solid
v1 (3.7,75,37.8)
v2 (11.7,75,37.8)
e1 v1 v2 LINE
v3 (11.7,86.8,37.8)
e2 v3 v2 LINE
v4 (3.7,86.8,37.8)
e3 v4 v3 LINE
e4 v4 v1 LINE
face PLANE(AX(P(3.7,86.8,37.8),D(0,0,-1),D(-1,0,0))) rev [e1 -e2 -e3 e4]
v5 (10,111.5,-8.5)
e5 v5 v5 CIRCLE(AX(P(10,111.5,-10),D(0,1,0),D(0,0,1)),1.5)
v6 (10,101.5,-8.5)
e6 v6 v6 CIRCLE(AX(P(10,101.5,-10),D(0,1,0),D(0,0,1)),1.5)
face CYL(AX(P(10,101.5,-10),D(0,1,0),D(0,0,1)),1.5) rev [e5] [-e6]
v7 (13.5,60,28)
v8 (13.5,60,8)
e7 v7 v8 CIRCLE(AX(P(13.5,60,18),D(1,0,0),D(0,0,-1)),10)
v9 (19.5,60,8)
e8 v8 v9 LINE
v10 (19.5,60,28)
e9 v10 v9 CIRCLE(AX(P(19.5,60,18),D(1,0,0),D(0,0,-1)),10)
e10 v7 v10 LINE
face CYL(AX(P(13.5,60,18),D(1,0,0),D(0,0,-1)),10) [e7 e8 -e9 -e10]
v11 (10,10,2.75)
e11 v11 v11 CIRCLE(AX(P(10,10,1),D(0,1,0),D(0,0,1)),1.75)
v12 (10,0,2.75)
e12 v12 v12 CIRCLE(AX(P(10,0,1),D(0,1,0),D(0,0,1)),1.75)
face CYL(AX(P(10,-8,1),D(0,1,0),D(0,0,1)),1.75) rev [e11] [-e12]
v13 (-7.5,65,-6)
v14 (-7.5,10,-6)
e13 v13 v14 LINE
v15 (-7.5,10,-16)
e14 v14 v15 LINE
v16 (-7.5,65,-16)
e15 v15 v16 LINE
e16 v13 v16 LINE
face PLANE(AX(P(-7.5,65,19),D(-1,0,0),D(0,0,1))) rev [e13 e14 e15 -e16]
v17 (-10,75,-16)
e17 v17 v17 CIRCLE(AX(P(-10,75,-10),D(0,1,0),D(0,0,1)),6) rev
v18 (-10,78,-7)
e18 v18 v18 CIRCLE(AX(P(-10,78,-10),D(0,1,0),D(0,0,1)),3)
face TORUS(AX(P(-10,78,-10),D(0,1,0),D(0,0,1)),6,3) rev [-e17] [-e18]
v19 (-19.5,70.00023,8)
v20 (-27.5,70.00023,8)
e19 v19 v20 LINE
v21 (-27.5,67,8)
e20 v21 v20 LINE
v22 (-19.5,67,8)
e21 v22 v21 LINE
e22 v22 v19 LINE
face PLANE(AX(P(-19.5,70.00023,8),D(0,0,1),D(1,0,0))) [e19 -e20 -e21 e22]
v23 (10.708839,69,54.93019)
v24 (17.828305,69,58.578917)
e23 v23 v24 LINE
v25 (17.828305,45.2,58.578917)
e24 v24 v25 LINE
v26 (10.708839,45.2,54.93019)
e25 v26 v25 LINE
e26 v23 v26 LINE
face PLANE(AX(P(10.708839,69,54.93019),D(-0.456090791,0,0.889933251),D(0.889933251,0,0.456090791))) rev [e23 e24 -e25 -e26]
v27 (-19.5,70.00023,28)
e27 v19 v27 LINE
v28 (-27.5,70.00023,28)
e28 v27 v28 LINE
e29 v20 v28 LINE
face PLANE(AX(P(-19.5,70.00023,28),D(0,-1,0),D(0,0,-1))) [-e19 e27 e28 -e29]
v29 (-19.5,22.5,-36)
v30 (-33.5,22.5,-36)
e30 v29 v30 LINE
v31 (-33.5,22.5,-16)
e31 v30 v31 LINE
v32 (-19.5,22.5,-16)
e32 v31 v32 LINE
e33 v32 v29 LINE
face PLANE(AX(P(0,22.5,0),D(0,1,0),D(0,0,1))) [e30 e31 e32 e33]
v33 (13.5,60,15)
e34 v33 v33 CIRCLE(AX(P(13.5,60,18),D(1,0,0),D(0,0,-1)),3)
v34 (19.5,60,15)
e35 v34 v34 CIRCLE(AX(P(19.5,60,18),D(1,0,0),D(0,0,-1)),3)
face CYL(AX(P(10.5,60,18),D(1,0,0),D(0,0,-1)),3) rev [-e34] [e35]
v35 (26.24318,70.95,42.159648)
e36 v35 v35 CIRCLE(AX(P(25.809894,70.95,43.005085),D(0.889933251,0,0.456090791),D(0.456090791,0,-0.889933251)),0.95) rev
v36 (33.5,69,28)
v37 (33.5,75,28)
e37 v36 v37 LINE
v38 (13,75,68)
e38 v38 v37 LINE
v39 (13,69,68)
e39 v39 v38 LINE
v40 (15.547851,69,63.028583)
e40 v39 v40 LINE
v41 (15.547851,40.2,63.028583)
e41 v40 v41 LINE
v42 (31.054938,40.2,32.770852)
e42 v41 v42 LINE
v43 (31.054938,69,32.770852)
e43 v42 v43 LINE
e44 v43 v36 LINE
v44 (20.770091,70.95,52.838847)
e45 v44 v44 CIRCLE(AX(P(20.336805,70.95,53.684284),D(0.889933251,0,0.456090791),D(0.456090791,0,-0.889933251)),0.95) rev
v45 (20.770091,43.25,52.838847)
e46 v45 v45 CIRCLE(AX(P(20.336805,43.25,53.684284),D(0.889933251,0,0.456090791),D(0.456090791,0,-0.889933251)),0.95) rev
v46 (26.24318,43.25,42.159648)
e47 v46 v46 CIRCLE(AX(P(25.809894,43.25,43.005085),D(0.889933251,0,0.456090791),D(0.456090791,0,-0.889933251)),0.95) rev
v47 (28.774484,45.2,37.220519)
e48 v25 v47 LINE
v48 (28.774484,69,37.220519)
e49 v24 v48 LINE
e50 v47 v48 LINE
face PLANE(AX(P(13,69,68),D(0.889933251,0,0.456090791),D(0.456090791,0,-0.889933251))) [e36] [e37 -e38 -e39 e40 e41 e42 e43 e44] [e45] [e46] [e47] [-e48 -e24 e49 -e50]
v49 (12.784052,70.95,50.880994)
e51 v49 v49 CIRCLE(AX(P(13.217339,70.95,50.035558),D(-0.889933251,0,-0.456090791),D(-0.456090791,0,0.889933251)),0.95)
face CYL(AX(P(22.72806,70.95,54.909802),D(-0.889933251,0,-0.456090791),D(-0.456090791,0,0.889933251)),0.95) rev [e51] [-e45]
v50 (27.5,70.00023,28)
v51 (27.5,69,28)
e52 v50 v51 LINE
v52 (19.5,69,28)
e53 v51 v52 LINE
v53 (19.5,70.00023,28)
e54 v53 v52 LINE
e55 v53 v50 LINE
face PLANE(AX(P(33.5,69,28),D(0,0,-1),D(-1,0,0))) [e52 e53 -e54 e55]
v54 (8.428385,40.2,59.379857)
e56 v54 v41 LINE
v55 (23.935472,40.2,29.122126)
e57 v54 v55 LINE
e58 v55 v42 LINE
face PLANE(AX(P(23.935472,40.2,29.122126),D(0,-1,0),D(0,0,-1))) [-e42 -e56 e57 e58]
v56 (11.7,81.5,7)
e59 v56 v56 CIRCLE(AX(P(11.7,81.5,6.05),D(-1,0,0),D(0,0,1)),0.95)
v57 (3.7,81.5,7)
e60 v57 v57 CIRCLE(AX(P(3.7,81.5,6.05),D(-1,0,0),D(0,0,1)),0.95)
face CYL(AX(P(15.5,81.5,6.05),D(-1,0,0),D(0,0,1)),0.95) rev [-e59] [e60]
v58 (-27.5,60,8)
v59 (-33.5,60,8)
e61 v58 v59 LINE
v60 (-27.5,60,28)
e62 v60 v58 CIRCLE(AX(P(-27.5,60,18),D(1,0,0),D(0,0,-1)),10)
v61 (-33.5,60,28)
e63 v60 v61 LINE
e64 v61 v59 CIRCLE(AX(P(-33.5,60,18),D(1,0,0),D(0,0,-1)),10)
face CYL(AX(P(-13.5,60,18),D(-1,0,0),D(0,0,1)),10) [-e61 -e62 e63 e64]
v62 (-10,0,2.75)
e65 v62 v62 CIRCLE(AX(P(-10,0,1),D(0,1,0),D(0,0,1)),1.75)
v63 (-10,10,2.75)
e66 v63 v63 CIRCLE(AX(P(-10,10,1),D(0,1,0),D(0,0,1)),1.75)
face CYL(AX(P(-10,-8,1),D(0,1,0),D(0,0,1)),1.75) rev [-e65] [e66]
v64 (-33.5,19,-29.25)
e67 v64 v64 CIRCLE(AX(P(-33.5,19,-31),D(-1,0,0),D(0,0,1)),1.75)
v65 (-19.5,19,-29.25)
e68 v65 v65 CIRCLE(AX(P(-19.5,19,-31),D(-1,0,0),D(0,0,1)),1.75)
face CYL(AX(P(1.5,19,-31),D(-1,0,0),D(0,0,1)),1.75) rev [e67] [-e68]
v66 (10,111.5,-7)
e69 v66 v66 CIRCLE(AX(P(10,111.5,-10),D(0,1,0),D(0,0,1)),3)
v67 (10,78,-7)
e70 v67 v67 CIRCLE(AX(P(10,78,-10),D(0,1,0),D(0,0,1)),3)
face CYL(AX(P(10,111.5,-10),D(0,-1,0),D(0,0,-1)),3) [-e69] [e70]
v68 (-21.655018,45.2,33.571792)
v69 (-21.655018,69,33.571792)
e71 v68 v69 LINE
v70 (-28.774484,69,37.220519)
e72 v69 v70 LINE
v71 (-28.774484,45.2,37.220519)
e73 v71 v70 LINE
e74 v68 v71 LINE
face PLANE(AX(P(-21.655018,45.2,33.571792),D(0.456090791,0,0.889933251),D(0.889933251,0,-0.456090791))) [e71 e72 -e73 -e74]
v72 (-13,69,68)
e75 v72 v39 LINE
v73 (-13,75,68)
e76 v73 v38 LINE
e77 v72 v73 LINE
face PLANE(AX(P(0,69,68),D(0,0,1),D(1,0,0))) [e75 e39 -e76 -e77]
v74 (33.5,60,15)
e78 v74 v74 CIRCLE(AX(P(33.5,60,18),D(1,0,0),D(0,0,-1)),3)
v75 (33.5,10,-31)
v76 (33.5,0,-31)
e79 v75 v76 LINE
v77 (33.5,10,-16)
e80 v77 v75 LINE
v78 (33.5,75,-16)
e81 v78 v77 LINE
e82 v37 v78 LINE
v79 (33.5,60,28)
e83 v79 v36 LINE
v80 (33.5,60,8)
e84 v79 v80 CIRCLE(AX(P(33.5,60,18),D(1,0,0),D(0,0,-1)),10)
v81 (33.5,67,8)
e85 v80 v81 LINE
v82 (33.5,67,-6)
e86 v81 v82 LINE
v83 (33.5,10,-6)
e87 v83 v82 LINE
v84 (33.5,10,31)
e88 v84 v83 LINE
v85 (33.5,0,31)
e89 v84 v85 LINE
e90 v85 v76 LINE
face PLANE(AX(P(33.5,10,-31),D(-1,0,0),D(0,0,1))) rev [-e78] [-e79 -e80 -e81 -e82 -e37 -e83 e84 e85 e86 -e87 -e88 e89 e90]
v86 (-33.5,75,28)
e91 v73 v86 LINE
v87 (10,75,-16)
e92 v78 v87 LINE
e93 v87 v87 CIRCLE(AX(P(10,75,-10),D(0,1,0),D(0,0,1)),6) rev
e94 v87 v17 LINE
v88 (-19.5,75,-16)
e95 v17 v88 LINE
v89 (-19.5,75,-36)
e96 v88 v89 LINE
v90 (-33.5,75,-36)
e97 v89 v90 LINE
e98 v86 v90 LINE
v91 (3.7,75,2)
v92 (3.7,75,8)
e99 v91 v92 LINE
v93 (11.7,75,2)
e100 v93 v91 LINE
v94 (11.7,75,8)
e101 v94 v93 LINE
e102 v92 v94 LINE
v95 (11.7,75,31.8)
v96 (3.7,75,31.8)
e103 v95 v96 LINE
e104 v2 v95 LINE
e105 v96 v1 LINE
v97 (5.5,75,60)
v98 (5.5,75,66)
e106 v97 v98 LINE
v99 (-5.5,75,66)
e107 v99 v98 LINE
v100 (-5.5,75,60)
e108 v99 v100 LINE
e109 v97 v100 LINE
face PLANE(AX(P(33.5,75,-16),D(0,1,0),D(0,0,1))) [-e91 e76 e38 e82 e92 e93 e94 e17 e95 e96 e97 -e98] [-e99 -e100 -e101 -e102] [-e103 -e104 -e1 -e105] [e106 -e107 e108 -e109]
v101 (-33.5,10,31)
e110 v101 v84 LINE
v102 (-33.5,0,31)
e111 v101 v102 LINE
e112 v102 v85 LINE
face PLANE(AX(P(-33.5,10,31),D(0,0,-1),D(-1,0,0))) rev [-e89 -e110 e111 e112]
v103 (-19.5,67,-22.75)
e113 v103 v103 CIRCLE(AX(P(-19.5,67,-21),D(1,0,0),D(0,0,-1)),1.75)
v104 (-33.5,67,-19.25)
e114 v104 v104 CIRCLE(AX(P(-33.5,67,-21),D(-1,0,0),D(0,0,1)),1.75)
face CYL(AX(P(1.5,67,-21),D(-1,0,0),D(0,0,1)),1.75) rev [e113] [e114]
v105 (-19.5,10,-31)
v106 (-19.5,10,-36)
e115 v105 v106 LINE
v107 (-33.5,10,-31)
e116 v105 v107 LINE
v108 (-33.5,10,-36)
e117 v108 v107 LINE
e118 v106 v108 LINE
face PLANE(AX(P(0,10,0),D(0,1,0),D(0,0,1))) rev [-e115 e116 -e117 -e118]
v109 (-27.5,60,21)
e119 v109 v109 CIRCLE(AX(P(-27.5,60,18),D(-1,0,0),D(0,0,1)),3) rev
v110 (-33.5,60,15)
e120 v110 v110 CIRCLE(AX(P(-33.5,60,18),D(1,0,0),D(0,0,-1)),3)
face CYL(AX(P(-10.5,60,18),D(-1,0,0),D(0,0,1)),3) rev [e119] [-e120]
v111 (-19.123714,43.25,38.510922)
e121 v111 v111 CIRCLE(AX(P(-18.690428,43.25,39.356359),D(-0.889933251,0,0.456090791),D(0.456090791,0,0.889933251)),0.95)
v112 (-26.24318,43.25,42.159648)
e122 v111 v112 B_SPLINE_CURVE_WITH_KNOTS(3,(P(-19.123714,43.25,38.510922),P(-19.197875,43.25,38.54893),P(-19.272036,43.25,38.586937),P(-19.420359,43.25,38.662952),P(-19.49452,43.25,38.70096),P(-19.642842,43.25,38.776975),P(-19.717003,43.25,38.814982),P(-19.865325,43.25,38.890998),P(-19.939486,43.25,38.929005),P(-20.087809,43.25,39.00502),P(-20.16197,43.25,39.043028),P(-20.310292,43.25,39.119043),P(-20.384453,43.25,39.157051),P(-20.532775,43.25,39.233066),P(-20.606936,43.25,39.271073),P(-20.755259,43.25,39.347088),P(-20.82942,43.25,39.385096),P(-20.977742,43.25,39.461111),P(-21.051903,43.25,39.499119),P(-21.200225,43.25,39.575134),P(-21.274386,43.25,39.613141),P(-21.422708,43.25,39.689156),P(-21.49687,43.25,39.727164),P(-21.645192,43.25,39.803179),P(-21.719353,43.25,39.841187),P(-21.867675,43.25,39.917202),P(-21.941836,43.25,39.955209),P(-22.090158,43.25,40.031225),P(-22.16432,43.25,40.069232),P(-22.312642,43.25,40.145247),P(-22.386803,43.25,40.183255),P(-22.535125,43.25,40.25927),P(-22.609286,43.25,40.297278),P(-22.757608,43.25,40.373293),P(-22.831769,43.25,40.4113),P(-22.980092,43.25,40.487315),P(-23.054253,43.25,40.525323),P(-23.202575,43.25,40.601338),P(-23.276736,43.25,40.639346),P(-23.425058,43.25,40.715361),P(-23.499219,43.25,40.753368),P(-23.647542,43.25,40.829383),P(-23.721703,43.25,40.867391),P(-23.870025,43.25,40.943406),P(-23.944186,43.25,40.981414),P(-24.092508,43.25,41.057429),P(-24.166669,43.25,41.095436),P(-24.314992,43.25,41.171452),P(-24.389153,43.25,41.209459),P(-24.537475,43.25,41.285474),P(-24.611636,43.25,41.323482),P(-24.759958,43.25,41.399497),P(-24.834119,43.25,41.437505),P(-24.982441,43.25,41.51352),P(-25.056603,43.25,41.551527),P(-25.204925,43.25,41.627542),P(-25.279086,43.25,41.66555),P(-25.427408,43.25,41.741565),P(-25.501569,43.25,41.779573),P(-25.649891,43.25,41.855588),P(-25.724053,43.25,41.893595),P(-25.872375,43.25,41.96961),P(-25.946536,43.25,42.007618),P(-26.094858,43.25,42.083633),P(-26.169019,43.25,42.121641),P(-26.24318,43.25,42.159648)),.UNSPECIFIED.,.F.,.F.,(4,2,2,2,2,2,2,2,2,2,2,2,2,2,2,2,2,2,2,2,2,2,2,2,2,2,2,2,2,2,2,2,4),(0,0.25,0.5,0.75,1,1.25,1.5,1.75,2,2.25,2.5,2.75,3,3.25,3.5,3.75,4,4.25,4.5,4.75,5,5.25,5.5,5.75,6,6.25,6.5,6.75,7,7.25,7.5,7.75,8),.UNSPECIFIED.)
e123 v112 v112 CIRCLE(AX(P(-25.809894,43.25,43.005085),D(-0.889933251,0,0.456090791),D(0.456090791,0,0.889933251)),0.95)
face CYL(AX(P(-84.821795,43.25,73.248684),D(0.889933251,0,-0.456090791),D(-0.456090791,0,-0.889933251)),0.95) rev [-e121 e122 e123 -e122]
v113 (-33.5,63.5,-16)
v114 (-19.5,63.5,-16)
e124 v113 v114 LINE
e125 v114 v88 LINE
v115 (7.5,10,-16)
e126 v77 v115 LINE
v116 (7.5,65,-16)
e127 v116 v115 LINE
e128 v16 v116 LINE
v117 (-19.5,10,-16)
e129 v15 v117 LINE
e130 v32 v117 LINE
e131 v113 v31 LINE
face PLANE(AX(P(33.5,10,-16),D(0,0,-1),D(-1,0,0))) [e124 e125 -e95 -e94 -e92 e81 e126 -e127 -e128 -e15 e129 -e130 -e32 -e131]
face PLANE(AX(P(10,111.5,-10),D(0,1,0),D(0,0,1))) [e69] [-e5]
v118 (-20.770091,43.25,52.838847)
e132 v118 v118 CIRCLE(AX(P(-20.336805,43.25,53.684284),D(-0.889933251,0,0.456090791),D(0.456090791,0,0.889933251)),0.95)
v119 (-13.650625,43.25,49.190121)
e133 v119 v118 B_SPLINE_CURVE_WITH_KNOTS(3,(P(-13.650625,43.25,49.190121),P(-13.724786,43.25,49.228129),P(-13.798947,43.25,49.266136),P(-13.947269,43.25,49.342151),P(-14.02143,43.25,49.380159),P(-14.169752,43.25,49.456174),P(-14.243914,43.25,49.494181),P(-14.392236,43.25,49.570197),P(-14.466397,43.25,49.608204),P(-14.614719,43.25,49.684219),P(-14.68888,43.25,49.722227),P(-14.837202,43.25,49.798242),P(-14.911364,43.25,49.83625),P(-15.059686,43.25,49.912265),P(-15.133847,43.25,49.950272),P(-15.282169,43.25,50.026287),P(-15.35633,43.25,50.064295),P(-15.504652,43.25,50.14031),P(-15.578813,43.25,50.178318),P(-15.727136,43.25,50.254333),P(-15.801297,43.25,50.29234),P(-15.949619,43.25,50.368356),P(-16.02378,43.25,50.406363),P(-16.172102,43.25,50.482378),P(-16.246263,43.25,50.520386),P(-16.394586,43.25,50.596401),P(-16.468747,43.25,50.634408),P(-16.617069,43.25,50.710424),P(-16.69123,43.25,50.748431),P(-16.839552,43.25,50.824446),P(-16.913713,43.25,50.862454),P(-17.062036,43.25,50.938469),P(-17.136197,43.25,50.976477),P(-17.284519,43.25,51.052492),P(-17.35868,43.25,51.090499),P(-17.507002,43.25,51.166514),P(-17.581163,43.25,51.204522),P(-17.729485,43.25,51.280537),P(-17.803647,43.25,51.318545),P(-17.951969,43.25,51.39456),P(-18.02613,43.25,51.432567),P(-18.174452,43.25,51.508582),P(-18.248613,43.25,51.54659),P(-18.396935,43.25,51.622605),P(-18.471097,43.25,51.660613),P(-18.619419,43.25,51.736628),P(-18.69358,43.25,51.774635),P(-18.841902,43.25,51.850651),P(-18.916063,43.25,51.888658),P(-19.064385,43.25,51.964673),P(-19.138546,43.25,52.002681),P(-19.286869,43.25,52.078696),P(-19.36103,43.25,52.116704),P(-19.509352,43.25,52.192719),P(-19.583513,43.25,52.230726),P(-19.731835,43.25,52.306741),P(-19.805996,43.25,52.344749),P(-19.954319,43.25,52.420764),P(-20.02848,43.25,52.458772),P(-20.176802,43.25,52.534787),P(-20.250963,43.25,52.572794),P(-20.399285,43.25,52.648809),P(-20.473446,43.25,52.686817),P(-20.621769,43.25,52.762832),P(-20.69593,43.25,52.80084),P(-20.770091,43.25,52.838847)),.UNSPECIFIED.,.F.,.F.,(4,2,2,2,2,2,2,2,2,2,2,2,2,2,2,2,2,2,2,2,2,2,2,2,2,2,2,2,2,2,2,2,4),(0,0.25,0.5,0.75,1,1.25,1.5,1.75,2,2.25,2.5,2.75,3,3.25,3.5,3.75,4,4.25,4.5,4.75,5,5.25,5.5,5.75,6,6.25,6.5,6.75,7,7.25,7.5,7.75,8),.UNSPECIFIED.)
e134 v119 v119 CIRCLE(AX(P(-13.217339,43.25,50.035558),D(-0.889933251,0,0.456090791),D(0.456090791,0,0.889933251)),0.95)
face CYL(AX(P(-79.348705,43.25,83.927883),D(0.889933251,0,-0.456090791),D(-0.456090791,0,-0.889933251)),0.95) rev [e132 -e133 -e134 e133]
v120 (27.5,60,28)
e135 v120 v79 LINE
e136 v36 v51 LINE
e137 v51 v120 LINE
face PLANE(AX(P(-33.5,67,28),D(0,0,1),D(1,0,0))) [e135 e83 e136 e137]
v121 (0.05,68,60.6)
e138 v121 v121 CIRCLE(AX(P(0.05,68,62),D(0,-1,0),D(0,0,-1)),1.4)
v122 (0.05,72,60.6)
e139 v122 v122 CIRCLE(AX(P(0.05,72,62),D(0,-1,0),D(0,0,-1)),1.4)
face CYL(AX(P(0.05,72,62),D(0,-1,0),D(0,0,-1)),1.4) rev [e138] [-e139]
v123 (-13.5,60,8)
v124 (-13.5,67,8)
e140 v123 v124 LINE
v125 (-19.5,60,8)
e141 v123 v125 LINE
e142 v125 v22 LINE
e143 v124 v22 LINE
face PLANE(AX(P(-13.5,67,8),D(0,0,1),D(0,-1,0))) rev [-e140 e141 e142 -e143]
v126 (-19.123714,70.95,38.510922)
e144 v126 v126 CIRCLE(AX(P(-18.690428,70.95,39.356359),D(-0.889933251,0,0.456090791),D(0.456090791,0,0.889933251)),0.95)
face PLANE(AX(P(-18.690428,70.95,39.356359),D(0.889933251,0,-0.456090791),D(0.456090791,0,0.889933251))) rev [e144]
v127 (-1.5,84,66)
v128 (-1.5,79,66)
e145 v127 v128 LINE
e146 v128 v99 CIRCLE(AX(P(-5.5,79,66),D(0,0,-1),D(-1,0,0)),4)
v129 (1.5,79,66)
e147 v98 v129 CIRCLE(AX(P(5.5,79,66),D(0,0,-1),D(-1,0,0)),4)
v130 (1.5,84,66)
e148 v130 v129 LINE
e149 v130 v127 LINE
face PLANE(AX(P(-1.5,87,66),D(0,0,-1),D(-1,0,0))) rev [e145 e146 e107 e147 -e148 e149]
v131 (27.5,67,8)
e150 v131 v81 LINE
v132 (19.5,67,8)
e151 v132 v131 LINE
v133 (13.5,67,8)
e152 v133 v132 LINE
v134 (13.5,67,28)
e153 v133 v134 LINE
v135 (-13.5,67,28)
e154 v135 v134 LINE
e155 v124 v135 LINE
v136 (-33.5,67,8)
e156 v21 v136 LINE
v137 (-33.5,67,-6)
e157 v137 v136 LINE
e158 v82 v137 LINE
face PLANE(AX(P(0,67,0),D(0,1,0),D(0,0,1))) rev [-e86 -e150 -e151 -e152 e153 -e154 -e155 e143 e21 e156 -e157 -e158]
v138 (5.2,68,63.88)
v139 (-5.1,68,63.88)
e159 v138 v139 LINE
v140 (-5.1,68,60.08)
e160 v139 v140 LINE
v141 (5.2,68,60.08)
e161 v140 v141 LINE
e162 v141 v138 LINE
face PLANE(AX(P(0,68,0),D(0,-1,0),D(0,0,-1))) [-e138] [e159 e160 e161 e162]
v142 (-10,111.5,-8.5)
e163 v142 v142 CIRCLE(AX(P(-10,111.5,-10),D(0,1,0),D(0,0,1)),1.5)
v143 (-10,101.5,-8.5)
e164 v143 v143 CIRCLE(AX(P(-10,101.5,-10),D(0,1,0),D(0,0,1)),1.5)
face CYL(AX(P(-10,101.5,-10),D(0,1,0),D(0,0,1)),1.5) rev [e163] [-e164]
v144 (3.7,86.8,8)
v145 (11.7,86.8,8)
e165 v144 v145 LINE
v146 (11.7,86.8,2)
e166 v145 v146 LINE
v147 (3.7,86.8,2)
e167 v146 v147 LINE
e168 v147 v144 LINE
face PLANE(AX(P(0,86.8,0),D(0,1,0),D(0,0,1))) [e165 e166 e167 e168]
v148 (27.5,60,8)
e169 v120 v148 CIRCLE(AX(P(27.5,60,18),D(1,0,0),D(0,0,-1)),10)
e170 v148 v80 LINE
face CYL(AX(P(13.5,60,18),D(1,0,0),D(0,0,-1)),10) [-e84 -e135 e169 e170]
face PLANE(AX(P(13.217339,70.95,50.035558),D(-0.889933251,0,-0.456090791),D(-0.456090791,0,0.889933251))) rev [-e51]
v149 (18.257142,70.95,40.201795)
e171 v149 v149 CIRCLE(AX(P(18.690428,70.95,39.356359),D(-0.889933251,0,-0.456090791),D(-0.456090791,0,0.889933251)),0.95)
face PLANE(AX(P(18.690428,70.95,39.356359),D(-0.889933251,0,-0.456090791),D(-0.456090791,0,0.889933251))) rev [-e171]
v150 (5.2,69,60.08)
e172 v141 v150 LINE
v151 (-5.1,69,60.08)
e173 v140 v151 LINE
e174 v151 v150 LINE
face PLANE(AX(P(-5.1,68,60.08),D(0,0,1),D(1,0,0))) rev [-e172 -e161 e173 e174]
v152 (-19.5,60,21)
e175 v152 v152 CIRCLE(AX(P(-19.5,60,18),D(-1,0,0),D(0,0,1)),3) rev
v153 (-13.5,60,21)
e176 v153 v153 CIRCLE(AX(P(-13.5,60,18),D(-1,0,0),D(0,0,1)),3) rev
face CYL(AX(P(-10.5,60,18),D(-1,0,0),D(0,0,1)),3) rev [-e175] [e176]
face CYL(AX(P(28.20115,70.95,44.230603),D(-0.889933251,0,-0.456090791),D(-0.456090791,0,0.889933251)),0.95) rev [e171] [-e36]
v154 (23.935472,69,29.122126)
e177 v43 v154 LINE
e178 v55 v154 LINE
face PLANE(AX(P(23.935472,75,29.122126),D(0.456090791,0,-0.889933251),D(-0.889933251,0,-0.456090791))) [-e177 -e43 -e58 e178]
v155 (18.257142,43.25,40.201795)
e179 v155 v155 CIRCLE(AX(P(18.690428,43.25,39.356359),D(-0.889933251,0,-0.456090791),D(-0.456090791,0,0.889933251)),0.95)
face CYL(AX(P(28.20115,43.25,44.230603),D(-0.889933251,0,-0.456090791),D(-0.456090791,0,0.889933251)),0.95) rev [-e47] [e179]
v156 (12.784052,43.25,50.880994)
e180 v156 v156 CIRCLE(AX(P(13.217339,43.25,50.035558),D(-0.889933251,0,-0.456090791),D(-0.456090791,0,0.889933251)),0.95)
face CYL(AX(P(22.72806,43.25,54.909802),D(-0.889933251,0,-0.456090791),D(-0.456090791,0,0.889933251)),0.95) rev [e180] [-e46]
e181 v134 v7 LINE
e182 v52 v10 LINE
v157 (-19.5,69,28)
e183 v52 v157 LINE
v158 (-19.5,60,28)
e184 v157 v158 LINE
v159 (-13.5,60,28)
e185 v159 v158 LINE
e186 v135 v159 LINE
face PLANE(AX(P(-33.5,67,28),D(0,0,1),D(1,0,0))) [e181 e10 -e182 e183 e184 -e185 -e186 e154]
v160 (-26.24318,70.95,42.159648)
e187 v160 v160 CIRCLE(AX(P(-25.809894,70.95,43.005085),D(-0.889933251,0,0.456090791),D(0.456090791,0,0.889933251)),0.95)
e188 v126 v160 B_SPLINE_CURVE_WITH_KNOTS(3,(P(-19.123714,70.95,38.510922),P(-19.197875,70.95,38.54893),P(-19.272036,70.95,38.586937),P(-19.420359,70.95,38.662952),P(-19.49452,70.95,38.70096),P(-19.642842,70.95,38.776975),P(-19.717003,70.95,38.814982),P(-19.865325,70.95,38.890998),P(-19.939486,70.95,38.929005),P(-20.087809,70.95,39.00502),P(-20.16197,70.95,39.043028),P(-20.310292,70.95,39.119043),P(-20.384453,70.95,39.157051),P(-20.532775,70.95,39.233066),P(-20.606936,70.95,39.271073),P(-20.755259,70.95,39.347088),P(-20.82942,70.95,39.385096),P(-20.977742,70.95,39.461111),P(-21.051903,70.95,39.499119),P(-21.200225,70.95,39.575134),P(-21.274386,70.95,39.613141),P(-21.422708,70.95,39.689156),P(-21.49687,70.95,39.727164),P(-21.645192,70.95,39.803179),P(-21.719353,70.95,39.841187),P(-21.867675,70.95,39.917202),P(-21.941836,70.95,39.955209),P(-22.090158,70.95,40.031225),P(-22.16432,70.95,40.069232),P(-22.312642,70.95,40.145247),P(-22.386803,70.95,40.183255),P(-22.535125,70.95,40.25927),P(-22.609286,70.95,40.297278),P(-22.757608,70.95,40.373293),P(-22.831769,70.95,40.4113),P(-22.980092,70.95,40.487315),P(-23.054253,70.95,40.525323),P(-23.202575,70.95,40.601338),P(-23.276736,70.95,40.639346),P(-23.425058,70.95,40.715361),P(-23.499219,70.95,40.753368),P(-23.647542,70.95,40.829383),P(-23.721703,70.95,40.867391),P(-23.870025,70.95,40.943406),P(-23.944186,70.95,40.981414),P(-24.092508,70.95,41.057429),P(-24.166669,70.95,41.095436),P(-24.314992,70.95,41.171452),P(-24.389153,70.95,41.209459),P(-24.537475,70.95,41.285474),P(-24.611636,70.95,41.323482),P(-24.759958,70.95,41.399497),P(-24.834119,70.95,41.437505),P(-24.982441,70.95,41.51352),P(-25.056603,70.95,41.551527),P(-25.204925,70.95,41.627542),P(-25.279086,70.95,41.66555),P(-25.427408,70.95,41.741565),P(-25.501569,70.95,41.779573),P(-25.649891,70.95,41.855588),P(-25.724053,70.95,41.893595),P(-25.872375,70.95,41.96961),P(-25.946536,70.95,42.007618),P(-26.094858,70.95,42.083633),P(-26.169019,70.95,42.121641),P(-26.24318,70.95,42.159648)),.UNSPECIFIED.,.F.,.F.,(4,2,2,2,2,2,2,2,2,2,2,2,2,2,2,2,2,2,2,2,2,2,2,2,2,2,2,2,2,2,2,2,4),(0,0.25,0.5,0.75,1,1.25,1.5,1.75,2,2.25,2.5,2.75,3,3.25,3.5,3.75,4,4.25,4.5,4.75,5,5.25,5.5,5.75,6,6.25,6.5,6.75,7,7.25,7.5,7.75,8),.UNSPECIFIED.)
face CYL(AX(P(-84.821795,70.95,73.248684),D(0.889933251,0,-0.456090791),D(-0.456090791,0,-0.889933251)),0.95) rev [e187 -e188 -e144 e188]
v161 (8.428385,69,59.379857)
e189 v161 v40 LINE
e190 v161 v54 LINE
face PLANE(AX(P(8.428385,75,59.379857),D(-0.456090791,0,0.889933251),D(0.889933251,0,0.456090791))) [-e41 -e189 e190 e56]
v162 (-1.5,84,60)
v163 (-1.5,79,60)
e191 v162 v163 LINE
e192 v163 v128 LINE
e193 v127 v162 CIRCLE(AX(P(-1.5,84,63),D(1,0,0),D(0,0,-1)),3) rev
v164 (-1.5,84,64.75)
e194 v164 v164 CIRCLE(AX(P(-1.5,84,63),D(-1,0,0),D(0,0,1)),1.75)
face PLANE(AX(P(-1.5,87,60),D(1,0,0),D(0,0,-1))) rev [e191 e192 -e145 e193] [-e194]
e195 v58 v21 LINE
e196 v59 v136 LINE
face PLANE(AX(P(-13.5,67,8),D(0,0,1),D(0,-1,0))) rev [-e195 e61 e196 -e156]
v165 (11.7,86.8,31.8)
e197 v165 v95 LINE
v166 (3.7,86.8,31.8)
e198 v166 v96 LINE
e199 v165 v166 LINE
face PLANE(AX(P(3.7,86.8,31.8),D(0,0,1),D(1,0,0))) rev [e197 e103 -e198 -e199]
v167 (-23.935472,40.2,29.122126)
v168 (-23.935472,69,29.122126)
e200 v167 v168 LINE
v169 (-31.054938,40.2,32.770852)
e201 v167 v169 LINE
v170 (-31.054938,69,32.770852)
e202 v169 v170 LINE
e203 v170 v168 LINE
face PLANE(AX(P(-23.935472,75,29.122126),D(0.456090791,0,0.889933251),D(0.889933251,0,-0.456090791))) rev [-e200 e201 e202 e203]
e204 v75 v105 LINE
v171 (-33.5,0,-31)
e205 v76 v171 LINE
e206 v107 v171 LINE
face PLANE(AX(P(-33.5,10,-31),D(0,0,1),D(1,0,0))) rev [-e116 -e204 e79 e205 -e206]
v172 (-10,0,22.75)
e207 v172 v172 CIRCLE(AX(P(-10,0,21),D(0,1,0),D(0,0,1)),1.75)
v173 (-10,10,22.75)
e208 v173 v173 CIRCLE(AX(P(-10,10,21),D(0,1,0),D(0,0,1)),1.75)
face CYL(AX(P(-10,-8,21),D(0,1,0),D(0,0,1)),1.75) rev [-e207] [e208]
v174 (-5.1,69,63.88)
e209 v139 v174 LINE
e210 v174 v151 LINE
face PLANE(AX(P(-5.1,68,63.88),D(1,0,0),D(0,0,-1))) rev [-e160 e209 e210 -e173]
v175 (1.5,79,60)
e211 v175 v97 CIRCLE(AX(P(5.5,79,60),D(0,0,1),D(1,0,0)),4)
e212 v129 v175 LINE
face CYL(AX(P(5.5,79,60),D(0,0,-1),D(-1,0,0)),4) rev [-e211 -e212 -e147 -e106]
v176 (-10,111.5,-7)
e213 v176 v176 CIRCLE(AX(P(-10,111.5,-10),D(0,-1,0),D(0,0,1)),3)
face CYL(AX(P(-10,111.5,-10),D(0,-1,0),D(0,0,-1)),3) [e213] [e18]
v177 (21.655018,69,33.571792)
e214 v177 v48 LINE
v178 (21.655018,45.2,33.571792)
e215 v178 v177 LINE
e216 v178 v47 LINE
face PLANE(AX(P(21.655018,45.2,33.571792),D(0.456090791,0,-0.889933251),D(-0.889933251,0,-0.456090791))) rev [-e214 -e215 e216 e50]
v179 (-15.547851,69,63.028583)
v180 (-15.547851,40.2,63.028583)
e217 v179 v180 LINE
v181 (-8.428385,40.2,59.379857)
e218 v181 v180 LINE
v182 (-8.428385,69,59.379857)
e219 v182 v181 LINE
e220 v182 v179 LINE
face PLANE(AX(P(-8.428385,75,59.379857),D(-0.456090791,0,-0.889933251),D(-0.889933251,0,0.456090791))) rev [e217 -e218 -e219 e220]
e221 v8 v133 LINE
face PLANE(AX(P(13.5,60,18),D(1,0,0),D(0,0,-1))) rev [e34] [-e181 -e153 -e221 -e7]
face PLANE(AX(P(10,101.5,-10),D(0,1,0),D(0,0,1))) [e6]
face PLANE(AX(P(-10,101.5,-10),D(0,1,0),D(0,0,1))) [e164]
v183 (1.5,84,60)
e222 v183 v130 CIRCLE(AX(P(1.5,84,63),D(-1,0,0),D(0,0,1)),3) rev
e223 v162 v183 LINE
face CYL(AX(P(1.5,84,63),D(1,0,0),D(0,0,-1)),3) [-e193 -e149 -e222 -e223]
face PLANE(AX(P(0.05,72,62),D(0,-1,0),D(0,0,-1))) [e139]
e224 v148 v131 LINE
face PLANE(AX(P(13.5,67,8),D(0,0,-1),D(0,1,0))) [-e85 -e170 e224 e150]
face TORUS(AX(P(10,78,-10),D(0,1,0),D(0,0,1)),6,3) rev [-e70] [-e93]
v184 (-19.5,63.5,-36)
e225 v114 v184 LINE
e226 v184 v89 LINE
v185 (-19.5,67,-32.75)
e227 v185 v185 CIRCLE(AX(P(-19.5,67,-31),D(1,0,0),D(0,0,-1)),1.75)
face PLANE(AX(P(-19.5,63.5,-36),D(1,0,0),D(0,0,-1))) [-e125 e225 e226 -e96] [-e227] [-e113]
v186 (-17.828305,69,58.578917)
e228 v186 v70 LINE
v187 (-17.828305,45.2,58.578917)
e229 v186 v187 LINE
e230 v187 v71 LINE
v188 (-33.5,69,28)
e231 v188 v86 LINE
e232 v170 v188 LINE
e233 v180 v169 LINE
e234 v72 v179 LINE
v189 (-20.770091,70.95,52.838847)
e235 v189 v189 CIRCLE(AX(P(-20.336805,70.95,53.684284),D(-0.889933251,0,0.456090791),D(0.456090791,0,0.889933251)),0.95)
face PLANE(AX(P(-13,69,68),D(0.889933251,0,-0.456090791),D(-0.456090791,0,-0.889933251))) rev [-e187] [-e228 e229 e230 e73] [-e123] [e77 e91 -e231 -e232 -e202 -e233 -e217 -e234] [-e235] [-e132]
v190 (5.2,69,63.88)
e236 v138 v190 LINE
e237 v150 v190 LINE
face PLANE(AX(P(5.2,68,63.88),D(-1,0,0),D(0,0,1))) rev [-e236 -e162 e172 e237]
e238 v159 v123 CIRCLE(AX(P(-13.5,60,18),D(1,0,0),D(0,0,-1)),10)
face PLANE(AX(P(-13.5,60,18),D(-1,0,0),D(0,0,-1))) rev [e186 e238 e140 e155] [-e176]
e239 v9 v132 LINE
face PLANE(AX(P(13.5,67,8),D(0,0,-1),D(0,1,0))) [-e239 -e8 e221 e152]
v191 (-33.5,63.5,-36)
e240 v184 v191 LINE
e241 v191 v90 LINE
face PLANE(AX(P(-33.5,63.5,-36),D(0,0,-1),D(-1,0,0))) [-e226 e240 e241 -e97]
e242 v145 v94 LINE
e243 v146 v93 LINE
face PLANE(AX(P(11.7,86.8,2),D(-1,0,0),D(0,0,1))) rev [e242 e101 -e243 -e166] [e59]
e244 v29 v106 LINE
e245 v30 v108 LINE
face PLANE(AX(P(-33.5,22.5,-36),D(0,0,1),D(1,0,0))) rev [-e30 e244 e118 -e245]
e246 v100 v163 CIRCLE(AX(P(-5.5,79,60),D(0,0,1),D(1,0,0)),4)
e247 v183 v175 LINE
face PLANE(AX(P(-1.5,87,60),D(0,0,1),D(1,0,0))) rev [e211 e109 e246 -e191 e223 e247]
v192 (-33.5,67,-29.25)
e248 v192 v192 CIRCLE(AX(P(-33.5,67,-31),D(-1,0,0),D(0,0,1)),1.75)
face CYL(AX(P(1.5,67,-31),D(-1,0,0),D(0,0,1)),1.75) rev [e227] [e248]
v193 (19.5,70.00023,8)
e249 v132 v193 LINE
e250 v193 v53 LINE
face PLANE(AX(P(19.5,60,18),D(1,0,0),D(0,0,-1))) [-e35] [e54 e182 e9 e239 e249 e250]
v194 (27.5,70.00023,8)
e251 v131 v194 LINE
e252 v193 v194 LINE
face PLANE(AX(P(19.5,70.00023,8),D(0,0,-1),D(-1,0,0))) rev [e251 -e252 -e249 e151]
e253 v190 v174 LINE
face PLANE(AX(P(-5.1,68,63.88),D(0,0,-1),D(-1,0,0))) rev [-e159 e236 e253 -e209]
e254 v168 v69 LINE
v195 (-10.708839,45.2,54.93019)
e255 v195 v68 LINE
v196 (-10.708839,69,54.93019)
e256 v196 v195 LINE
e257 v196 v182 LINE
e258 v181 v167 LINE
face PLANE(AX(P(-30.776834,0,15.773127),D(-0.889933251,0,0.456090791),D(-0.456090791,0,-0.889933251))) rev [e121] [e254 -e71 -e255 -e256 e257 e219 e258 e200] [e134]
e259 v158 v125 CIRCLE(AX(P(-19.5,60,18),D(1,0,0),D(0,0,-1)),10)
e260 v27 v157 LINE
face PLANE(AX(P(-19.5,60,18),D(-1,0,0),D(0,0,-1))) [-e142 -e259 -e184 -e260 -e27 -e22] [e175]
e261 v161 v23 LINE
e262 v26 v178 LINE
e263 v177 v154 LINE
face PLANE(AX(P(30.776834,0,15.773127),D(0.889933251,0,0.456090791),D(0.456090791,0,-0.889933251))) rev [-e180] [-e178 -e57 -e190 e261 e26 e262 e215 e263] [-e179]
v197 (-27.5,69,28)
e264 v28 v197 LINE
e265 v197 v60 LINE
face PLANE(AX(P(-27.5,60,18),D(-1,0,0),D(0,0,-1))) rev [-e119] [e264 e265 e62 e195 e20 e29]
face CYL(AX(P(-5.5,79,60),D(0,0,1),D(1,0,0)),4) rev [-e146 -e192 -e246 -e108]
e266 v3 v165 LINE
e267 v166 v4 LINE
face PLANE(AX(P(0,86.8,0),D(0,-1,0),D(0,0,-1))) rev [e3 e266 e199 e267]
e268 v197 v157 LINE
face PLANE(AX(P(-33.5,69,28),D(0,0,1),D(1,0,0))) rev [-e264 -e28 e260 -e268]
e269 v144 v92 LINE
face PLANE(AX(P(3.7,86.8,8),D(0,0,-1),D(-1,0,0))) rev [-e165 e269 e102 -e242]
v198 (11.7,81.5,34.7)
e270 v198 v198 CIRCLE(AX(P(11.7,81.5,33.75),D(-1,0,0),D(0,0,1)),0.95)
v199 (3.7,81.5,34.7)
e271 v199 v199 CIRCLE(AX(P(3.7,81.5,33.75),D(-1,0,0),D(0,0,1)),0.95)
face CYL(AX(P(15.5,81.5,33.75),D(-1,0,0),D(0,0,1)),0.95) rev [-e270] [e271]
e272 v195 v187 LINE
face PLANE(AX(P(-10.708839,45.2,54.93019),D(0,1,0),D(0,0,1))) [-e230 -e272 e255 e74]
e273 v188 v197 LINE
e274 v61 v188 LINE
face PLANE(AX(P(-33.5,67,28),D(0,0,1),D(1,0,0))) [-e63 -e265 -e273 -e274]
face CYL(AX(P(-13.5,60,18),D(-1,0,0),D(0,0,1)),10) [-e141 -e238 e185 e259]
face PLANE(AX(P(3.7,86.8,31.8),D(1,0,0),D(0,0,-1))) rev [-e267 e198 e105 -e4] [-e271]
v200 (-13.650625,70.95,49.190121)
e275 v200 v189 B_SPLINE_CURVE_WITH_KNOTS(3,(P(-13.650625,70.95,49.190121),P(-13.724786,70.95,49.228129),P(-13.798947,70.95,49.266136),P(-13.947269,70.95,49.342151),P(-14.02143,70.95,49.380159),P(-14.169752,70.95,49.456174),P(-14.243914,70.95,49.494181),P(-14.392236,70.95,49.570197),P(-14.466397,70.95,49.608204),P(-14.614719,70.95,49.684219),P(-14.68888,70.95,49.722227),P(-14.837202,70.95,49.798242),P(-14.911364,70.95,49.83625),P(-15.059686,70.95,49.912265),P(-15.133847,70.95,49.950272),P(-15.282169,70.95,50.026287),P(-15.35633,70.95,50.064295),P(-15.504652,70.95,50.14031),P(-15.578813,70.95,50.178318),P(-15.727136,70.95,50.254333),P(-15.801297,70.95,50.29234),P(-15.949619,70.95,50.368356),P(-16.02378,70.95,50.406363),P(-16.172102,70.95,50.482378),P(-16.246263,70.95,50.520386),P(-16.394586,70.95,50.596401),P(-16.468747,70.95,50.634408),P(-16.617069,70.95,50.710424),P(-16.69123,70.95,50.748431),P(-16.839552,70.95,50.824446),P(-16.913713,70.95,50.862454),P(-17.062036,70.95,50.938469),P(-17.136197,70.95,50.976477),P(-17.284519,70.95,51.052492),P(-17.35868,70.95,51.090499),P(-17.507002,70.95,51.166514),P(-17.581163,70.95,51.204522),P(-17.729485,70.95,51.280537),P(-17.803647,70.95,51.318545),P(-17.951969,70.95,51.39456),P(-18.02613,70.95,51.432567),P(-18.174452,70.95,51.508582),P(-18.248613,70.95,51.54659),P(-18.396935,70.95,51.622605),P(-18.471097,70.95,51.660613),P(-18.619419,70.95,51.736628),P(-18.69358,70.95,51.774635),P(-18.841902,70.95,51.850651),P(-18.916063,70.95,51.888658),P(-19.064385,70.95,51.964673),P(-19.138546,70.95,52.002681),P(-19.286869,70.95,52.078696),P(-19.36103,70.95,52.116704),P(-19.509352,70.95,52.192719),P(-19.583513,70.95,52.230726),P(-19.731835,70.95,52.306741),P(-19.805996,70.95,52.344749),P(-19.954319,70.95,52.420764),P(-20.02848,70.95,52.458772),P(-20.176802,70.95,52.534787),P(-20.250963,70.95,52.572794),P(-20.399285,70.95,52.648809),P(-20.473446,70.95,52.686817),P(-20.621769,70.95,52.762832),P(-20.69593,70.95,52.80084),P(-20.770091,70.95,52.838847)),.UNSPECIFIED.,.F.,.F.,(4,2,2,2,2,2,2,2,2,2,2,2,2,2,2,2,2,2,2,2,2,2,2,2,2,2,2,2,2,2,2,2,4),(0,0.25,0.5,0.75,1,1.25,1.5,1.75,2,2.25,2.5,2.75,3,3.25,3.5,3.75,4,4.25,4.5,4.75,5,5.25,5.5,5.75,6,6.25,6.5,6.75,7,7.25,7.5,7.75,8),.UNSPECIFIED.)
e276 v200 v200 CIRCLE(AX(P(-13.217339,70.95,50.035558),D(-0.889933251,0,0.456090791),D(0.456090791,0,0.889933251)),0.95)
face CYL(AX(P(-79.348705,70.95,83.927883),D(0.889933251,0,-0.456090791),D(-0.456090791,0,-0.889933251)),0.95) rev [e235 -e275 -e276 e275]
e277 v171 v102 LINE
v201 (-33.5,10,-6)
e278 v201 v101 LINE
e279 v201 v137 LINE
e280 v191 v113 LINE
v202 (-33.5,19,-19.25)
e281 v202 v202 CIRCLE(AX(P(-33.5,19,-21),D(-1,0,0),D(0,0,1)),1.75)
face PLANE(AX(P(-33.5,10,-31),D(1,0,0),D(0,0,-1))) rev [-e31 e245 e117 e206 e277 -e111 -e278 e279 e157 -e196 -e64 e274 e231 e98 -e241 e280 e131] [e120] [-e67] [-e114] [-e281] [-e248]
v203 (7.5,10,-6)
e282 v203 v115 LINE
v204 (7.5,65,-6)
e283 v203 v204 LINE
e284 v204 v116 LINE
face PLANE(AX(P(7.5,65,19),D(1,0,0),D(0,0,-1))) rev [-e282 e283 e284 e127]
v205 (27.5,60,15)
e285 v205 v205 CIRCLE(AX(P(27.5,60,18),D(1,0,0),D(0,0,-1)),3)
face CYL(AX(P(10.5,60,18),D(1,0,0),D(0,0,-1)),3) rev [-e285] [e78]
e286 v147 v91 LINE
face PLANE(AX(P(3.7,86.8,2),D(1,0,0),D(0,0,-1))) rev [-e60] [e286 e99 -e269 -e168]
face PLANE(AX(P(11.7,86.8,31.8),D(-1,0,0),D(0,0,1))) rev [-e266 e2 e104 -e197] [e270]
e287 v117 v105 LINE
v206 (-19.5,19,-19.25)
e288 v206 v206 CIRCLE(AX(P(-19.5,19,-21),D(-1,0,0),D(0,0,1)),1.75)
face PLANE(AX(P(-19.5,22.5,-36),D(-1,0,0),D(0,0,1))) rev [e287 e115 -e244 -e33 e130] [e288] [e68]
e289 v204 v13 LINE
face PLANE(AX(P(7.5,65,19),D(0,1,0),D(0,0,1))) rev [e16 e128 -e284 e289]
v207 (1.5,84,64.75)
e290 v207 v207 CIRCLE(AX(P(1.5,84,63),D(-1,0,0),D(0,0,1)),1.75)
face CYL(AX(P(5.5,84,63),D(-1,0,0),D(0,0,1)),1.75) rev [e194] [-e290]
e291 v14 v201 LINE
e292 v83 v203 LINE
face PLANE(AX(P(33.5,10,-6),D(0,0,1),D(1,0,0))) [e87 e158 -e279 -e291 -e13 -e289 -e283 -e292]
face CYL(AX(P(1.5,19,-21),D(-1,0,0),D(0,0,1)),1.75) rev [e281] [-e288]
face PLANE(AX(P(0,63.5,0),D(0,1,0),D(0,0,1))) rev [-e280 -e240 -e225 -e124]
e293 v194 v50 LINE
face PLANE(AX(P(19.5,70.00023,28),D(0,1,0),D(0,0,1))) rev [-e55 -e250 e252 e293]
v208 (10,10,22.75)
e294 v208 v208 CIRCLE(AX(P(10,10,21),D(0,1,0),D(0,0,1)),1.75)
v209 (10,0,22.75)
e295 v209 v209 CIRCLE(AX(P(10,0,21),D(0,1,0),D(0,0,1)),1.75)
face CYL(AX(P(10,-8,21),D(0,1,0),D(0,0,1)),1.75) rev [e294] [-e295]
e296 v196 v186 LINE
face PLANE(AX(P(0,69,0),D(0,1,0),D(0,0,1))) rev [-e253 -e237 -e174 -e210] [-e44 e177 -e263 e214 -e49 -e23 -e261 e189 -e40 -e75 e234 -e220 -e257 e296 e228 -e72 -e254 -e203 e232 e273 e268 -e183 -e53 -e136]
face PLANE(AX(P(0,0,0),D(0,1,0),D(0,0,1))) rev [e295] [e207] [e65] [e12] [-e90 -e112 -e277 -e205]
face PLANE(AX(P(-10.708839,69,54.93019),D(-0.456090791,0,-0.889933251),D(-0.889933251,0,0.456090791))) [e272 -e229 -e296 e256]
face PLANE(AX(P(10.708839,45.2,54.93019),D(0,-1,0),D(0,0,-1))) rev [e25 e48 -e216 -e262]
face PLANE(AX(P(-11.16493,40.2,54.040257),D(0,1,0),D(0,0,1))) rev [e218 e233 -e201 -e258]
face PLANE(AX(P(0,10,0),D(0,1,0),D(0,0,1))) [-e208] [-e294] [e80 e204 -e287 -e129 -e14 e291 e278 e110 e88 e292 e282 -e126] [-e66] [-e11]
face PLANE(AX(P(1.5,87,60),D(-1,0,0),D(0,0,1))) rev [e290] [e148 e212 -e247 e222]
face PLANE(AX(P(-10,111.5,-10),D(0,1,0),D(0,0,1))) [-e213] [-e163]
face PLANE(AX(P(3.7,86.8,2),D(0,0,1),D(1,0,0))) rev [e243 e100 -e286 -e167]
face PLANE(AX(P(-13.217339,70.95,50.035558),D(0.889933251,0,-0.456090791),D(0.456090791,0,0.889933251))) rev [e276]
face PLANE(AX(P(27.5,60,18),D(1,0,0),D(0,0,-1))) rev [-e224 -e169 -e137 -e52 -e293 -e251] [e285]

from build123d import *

# Parameters (mm, degrees)
SKETCH_1_W             = 67
SKETCH_1_H             = 62
EXTRUDE_1_DEPTH        = 10
SKETCH_3_W             = 14
SKETCH_3_H             = 20
EXTRUDE_2_DEPTH        = 12.5
SKETCH_4_W             = 10
SKETCH_4_H             = 65
EXTRUDE_3_DEPTH        = 67
SKETCH_5_W             = 67
SKETCH_5_H             = 44
EXTRUDE_4_DEPTH        = 8
EXTRUDE_5_DEPTH        = 20
CUT_EXTRUDE_START      = -6
CUT_EXTRUDE_1_DEPTH    = 8
EXTRUDE_6_DEPTH        = 6
SKETCH_9_R             = 3
CUT_EXTRUDE_2_DEPTH    = 23
SKETCH_10_W            = 24
SKETCH_10_H            = 23.8
EXTRUDE_7_DEPTH        = 8
SKETCH_12_W            = 14
SKETCH_12_H            = 20
EXTRUDE_8_DEPTH        = 11.5
SKETCH_13_R            = 0.95
CUT_EXTRUDE_4_DEPTH    = 8
SKETCH_14_W            = 8
SKETCH_14_H            = 6
EXTRUDE_9_DEPTH        = 11.8
SKETCH_15_R            = 0.95
CUT_EXTRUDE_5_DEPTH    = 11.8
SKETCH_16_W            = 3
SKETCH_16_H            = 6
EXTRUDE_10_DEPTH       = 12
FILLET_1_RADIUS        = 3
FILLET_1_LENGTH        = 3
SKETCH_17_R            = 1.75
CUT_EXTRUDE_6_DEPTH    = 7
SKETCH_18_R            = 3
EXTRUDE_11_DEPTH       = 36.5
FILLET_2_R             = 3
FILLET_2_OF_MIRROR_1_R = 3
SKETCH_20_R            = 1.75
CUT_EXTRUDE_7_DEPTH    = 35
SKETCH_21_W            = 15
SKETCH_21_H            = 55
CUT_EXTRUDE_8_DEPTH    = 35
SKETCH_24_R            = 1.75
CUT_EXTRUDE_11_DEPTH   = 18
SKETCH_25_R            = 1.5
CUT_EXTRUDE_12_DEPTH   = 10
FILLET_3_R             = 4
SKETCH_26_W            = 10.3
SKETCH_26_H            = 3.8
EXTRUDE_12_DEPTH       = 1
SKETCH_27_R            = 1.4
CUT_EXTRUDE_13_DEPTH   = 4


with BuildPart() as part:
    # 草图1 → 凸台-拉伸1 (new body)
    with BuildSketch(Plane(origin=(0, 0, 0), x_dir=(1, 0, 0), z_dir=(0, 1, 0))):
        Rectangle(SKETCH_1_W, SKETCH_1_H)
    extrude(amount=EXTRUDE_1_DEPTH)

    # 草图3 → 凸台-拉伸2 (add)
    with BuildSketch(Plane(origin=(0, 10, 0), x_dir=(1, 0, 0), z_dir=(0, 1, 0))):
        with Locations((-26.5, 26)):
            Rectangle(SKETCH_3_W, SKETCH_3_H)
    extrude(amount=EXTRUDE_2_DEPTH)

    # 草图4 → 凸台-拉伸3 (add)
    with BuildSketch(Plane.ZY.offset(33.5)):
        with Locations((-11, 42.5)):
            Rectangle(SKETCH_4_W, SKETCH_4_H)
    extrude(amount=-EXTRUDE_3_DEPTH)

    # 草图5 → 凸台-拉伸4 (add)
    with BuildSketch(Plane(origin=(0, 75, 0), x_dir=(1, 0, 0), z_dir=(0, 1, 0))):
        with Locations((0, -6)):
            Rectangle(SKETCH_5_W, SKETCH_5_H)
    extrude(amount=-EXTRUDE_4_DEPTH)

    # 草图6 → 凸台-拉伸5 (add)
    with BuildSketch(Plane(origin=(33.5, 0, 0), x_dir=(0, 0, -1), z_dir=(1, 0, 0))):
        with BuildLine():
            Line((-28, 60), (-28, 67))
            Line((-28, 67), (-8, 67))
            Line((-8, 67), (-8, 60))
            ThreePointArc((-8, 60), (-18, 50), (-28, 60))
        make_face()
    extrude_5 = extrude(amount=-EXTRUDE_5_DEPTH)

    # 草图7 → 切除-拉伸1 (cut)
    with BuildSketch(Plane(origin=(33.5, 0, 0), x_dir=(0, 0, -1), z_dir=(1, 0, 0)).offset(CUT_EXTRUDE_START)):
        with BuildLine():
            Line((-28, 60), (-28, 70.000230089))
            Line((-28, 70.000230089), (-8, 70.000230089))
            Line((-8, 70.000230089), (-8, 60))
            ThreePointArc((-8, 60), (-18, 50), (-28, 60))
        make_face()
    cut_extrude_1 = extrude(amount=-CUT_EXTRUDE_1_DEPTH, mode=Mode.SUBTRACT)

    # 草图8 → 凸台-拉伸6 (add)
    with BuildSketch(Plane(origin=(0, 75, 0), x_dir=(1, 0, 0), z_dir=(0, 1, 0))):
        Polygon((0, -68), (13, -68), (33.5, -28), (0, -28), align=None)
    extrude_6 = extrude(amount=-EXTRUDE_6_DEPTH)

    # 草图9 → 切除-拉伸2 (cut)
    with BuildSketch(Plane(origin=(33.5, 0, 0), x_dir=(0, 0, -1), z_dir=(1, 0, 0))):
        with Locations((-18, 60)):
            Circle(SKETCH_9_R)
    cut_extrude_2 = extrude(amount=-CUT_EXTRUDE_2_DEPTH, mode=Mode.SUBTRACT)

    # 草图10 → 凸台-拉伸7 (add)
    with BuildSketch(Plane(origin=(37.896299963, 0, 19.421853731), x_dir=(0.4560907909103985, 0, -0.8899332505568759), z_dir=(0.8899332505568758, 0, 0.45609079091039845))):
        Polygon((-44, 75), (-15, 75), (-15, 40.2), (-43, 40.2), (-49, 40.2), (-49, 75), align=None)
        with Locations((-32, 57.1)):
            Rectangle(SKETCH_10_W, SKETCH_10_H, mode=Mode.SUBTRACT)
    extrude_7 = extrude(amount=-EXTRUDE_7_DEPTH)

    # 草图12 → 凸台-拉伸8 (add)
    with BuildSketch(Plane(origin=(0, 75, 0), x_dir=(1, 0, 0), z_dir=(0, 1, 0))):
        with Locations((-26.5, 26)):
            Rectangle(SKETCH_12_W, SKETCH_12_H)
    extrude(amount=-EXTRUDE_8_DEPTH)

    # 草图13 → 切除-拉伸4 (cut)
    with BuildSketch(Plane(origin=(30.776833958, 0, 15.773127404), x_dir=(-0.4560907909103988, 0, 0.8899332505568758), z_dir=(-0.8899332505568757, 0, -0.4560907909103987))):
        with Locations((38.5, 70.95)):
            Circle(SKETCH_13_R)
        with Locations((26.5, 70.95)):
            Circle(SKETCH_13_R)
        with Locations((26.5, 43.25)):
            Circle(SKETCH_13_R)
        with Locations((38.5, 43.25)):
            Circle(SKETCH_13_R)
    cut_extrude_4 = extrude(amount=-CUT_EXTRUDE_4_DEPTH, mode=Mode.SUBTRACT)

    # 草图14 → 凸台-拉伸9 (add)
    with BuildSketch(Plane(origin=(0, 75, 0), x_dir=(1, 0, 0), z_dir=(0, 1, 0))):
        with Locations((7.7, -5)):
            Rectangle(SKETCH_14_W, SKETCH_14_H)
        with Locations((7.7, -34.8)):
            Rectangle(SKETCH_14_W, SKETCH_14_H)
    extrude(amount=EXTRUDE_9_DEPTH)

    # 草图15 → 切除-拉伸5 (cut)
    with BuildSketch(Plane.ZY.offset(-3.7)):
        with Locations((33.75, 81.5)):
            Circle(SKETCH_15_R)
        with Locations((6.05, 81.5)):
            Circle(SKETCH_15_R)
    extrude(amount=-CUT_EXTRUDE_5_DEPTH, mode=Mode.SUBTRACT)

    # 草图16 → 凸台-拉伸10 (add)
    with BuildSketch(Plane(origin=(0, 75, 0), x_dir=(1, 0, 0), z_dir=(0, 1, 0))):
        with Locations((0, -63)):
            Rectangle(SKETCH_16_W, SKETCH_16_H)
    extrude(amount=EXTRUDE_10_DEPTH)

    # 圆角1: full round fillet: the end face becomes a half cylinder, R = half its width
    fillet_1_face = Plane((0, 87, 63), x_dir=(1, 0, 0), z_dir=(0, 1, 0))  # on the end face: x along it, z out of the body
    fillet_1_slab = fillet_1_face.offset(-FILLET_1_RADIUS / 2) * Box(FILLET_1_LENGTH, 2 * FILLET_1_RADIUS, FILLET_1_RADIUS, mode=Mode.PRIVATE)  # the body's end, R deep
    fillet_1_round = Plane((0, 84, 63), x_dir=(0, 1, 0), z_dir=(1, 0, 0)) * Cylinder(FILLET_1_RADIUS, FILLET_1_LENGTH, mode=Mode.PRIVATE)  # its axis R under the face
    add(fillet_1_slab - fillet_1_round, mode=Mode.SUBTRACT)

    # 草图17 → 切除-拉伸6 (cut)
    with BuildSketch(Plane.ZY.offset(1.5)):
        with Locations((63, 84)):
            Circle(SKETCH_17_R)
    extrude(amount=-CUT_EXTRUDE_6_DEPTH, mode=Mode.SUBTRACT)

    # 草图18 → 凸台-拉伸11 (add)
    with BuildSketch(Plane(origin=(0, 75, 0), x_dir=(1, 0, 0), z_dir=(0, 1, 0))):
        with Locations(Location((10, 10, 0), (0, 0, 270))):
            Circle(SKETCH_18_R)
    extrude_11 = extrude(amount=EXTRUDE_11_DEPTH)

    # 圆角2
    fillet_2_edges = [part.edges().sort_by_distance(p)[0] for p in [
        (10, 75, -13),
    ]]
    fillet(fillet_2_edges, radius=FILLET_2_R - 0.0001)  # a hair under: the kernel refuses the full size

    # 镜向1: 凸台-拉伸5, 切除-拉伸1, 凸台-拉伸6, 切除-拉伸2, 凸台-拉伸7, 切除-拉伸4, 凸台-拉伸11 across plane
    add(extrude_5.mirror(Plane(origin=(0, 0, 0), x_dir=(0, 0, 1), z_dir=(1, 0, 0))))
    add(cut_extrude_1.mirror(Plane(origin=(0, 0, 0), x_dir=(0, 0, 1), z_dir=(1, 0, 0))), mode=Mode.SUBTRACT)
    add(extrude_6.mirror(Plane(origin=(0, 0, 0), x_dir=(0, 0, 1), z_dir=(1, 0, 0))))
    add(cut_extrude_2.mirror(Plane(origin=(0, 0, 0), x_dir=(0, 0, 1), z_dir=(1, 0, 0))), mode=Mode.SUBTRACT)
    add(extrude_7.mirror(Plane(origin=(0, 0, 0), x_dir=(0, 0, 1), z_dir=(1, 0, 0))))
    add(cut_extrude_4.mirror(Plane(origin=(0, 0, 0), x_dir=(0, 0, 1), z_dir=(1, 0, 0))), mode=Mode.SUBTRACT)
    add(extrude_11.mirror(Plane(origin=(0, 0, 0), x_dir=(0, 0, 1), z_dir=(1, 0, 0))))

    # 圆角2 of 镜向1
    fillet_2_of_mirror_1_edges = [part.edges().sort_by_distance(p)[0] for p in [
        (-10, 75, -13),
    ]]
    fillet(fillet_2_of_mirror_1_edges, radius=FILLET_2_OF_MIRROR_1_R - 0.0001)  # a hair under: the kernel refuses the full size

    # 草图20 → 切除-拉伸7 (cut)
    with BuildSketch(Plane.ZY.offset(33.5)):
        with Locations((-31, 67)):
            Circle(SKETCH_20_R)
        with Locations((-21, 67)):
            Circle(SKETCH_20_R)
        with Locations((-31, 19)):
            Circle(SKETCH_20_R)
        with Locations((-21, 19)):
            Circle(SKETCH_20_R)
    extrude(amount=-CUT_EXTRUDE_7_DEPTH, mode=Mode.SUBTRACT)

    # 草图21 → 切除-拉伸8 (cut)
    with BuildSketch(Plane(origin=(0, 0, -16), x_dir=(-1, 0, 0), z_dir=(0, 0, -1))):
        with Locations((0, 37.5)):
            Rectangle(SKETCH_21_W, SKETCH_21_H)
    extrude(amount=-CUT_EXTRUDE_8_DEPTH, mode=Mode.SUBTRACT)

    # 草图24 → 切除-拉伸11 (cut)
    with BuildSketch(Plane(origin=(0, 10, 0), x_dir=(1, 0, 0), z_dir=(0, 1, 0))):
        with Locations(Location((-10, -21, 0), (0, 0, 270))):
            Circle(SKETCH_24_R)
        with Locations(Location((10, -21, 0), (0, 0, 270))):
            Circle(SKETCH_24_R)
        with Locations(Location((-10, -1, 0), (0, 0, 270))):
            Circle(SKETCH_24_R)
        with Locations(Location((10, -1, 0), (0, 0, 270))):
            Circle(SKETCH_24_R)
    extrude(amount=-CUT_EXTRUDE_11_DEPTH, mode=Mode.SUBTRACT)

    # 草图25 → 切除-拉伸12 (cut)
    with BuildSketch(Plane(origin=(0, 111.5, 0), x_dir=(1, 0, 0), z_dir=(0, 1, 0))):
        with Locations(Location((10, 10, 0), (0, 0, 270))):
            Circle(SKETCH_25_R)
        with Locations(Location((-10, 10, 0), (0, 0, 270))):
            Circle(SKETCH_25_R)
    extrude(amount=-CUT_EXTRUDE_12_DEPTH, mode=Mode.SUBTRACT)

    # 圆角3
    fillet_3_edges = [part.edges().sort_by_distance(p)[0] for p in [
        (-1.5, 75, 63),
        (1.5, 75, 63),
    ]]
    fillet(fillet_3_edges, radius=FILLET_3_R)

    # 草图26 → 凸台-拉伸12 (add)
    with BuildSketch(Plane.XZ.offset(-69)):
        with Locations((0.05, 61.98)):
            Rectangle(SKETCH_26_W, SKETCH_26_H)
    extrude(amount=EXTRUDE_12_DEPTH)

    # 草图27 → 切除-拉伸13 (cut)
    with BuildSketch(Plane.XZ.offset(-68)):
        with Locations(Location((0.05, 62, 0), (0, 0, 270))):
            Circle(SKETCH_27_R)
    extrude(amount=-CUT_EXTRUDE_13_DEPTH, mode=Mode.SUBTRACT)


solid = part.part
